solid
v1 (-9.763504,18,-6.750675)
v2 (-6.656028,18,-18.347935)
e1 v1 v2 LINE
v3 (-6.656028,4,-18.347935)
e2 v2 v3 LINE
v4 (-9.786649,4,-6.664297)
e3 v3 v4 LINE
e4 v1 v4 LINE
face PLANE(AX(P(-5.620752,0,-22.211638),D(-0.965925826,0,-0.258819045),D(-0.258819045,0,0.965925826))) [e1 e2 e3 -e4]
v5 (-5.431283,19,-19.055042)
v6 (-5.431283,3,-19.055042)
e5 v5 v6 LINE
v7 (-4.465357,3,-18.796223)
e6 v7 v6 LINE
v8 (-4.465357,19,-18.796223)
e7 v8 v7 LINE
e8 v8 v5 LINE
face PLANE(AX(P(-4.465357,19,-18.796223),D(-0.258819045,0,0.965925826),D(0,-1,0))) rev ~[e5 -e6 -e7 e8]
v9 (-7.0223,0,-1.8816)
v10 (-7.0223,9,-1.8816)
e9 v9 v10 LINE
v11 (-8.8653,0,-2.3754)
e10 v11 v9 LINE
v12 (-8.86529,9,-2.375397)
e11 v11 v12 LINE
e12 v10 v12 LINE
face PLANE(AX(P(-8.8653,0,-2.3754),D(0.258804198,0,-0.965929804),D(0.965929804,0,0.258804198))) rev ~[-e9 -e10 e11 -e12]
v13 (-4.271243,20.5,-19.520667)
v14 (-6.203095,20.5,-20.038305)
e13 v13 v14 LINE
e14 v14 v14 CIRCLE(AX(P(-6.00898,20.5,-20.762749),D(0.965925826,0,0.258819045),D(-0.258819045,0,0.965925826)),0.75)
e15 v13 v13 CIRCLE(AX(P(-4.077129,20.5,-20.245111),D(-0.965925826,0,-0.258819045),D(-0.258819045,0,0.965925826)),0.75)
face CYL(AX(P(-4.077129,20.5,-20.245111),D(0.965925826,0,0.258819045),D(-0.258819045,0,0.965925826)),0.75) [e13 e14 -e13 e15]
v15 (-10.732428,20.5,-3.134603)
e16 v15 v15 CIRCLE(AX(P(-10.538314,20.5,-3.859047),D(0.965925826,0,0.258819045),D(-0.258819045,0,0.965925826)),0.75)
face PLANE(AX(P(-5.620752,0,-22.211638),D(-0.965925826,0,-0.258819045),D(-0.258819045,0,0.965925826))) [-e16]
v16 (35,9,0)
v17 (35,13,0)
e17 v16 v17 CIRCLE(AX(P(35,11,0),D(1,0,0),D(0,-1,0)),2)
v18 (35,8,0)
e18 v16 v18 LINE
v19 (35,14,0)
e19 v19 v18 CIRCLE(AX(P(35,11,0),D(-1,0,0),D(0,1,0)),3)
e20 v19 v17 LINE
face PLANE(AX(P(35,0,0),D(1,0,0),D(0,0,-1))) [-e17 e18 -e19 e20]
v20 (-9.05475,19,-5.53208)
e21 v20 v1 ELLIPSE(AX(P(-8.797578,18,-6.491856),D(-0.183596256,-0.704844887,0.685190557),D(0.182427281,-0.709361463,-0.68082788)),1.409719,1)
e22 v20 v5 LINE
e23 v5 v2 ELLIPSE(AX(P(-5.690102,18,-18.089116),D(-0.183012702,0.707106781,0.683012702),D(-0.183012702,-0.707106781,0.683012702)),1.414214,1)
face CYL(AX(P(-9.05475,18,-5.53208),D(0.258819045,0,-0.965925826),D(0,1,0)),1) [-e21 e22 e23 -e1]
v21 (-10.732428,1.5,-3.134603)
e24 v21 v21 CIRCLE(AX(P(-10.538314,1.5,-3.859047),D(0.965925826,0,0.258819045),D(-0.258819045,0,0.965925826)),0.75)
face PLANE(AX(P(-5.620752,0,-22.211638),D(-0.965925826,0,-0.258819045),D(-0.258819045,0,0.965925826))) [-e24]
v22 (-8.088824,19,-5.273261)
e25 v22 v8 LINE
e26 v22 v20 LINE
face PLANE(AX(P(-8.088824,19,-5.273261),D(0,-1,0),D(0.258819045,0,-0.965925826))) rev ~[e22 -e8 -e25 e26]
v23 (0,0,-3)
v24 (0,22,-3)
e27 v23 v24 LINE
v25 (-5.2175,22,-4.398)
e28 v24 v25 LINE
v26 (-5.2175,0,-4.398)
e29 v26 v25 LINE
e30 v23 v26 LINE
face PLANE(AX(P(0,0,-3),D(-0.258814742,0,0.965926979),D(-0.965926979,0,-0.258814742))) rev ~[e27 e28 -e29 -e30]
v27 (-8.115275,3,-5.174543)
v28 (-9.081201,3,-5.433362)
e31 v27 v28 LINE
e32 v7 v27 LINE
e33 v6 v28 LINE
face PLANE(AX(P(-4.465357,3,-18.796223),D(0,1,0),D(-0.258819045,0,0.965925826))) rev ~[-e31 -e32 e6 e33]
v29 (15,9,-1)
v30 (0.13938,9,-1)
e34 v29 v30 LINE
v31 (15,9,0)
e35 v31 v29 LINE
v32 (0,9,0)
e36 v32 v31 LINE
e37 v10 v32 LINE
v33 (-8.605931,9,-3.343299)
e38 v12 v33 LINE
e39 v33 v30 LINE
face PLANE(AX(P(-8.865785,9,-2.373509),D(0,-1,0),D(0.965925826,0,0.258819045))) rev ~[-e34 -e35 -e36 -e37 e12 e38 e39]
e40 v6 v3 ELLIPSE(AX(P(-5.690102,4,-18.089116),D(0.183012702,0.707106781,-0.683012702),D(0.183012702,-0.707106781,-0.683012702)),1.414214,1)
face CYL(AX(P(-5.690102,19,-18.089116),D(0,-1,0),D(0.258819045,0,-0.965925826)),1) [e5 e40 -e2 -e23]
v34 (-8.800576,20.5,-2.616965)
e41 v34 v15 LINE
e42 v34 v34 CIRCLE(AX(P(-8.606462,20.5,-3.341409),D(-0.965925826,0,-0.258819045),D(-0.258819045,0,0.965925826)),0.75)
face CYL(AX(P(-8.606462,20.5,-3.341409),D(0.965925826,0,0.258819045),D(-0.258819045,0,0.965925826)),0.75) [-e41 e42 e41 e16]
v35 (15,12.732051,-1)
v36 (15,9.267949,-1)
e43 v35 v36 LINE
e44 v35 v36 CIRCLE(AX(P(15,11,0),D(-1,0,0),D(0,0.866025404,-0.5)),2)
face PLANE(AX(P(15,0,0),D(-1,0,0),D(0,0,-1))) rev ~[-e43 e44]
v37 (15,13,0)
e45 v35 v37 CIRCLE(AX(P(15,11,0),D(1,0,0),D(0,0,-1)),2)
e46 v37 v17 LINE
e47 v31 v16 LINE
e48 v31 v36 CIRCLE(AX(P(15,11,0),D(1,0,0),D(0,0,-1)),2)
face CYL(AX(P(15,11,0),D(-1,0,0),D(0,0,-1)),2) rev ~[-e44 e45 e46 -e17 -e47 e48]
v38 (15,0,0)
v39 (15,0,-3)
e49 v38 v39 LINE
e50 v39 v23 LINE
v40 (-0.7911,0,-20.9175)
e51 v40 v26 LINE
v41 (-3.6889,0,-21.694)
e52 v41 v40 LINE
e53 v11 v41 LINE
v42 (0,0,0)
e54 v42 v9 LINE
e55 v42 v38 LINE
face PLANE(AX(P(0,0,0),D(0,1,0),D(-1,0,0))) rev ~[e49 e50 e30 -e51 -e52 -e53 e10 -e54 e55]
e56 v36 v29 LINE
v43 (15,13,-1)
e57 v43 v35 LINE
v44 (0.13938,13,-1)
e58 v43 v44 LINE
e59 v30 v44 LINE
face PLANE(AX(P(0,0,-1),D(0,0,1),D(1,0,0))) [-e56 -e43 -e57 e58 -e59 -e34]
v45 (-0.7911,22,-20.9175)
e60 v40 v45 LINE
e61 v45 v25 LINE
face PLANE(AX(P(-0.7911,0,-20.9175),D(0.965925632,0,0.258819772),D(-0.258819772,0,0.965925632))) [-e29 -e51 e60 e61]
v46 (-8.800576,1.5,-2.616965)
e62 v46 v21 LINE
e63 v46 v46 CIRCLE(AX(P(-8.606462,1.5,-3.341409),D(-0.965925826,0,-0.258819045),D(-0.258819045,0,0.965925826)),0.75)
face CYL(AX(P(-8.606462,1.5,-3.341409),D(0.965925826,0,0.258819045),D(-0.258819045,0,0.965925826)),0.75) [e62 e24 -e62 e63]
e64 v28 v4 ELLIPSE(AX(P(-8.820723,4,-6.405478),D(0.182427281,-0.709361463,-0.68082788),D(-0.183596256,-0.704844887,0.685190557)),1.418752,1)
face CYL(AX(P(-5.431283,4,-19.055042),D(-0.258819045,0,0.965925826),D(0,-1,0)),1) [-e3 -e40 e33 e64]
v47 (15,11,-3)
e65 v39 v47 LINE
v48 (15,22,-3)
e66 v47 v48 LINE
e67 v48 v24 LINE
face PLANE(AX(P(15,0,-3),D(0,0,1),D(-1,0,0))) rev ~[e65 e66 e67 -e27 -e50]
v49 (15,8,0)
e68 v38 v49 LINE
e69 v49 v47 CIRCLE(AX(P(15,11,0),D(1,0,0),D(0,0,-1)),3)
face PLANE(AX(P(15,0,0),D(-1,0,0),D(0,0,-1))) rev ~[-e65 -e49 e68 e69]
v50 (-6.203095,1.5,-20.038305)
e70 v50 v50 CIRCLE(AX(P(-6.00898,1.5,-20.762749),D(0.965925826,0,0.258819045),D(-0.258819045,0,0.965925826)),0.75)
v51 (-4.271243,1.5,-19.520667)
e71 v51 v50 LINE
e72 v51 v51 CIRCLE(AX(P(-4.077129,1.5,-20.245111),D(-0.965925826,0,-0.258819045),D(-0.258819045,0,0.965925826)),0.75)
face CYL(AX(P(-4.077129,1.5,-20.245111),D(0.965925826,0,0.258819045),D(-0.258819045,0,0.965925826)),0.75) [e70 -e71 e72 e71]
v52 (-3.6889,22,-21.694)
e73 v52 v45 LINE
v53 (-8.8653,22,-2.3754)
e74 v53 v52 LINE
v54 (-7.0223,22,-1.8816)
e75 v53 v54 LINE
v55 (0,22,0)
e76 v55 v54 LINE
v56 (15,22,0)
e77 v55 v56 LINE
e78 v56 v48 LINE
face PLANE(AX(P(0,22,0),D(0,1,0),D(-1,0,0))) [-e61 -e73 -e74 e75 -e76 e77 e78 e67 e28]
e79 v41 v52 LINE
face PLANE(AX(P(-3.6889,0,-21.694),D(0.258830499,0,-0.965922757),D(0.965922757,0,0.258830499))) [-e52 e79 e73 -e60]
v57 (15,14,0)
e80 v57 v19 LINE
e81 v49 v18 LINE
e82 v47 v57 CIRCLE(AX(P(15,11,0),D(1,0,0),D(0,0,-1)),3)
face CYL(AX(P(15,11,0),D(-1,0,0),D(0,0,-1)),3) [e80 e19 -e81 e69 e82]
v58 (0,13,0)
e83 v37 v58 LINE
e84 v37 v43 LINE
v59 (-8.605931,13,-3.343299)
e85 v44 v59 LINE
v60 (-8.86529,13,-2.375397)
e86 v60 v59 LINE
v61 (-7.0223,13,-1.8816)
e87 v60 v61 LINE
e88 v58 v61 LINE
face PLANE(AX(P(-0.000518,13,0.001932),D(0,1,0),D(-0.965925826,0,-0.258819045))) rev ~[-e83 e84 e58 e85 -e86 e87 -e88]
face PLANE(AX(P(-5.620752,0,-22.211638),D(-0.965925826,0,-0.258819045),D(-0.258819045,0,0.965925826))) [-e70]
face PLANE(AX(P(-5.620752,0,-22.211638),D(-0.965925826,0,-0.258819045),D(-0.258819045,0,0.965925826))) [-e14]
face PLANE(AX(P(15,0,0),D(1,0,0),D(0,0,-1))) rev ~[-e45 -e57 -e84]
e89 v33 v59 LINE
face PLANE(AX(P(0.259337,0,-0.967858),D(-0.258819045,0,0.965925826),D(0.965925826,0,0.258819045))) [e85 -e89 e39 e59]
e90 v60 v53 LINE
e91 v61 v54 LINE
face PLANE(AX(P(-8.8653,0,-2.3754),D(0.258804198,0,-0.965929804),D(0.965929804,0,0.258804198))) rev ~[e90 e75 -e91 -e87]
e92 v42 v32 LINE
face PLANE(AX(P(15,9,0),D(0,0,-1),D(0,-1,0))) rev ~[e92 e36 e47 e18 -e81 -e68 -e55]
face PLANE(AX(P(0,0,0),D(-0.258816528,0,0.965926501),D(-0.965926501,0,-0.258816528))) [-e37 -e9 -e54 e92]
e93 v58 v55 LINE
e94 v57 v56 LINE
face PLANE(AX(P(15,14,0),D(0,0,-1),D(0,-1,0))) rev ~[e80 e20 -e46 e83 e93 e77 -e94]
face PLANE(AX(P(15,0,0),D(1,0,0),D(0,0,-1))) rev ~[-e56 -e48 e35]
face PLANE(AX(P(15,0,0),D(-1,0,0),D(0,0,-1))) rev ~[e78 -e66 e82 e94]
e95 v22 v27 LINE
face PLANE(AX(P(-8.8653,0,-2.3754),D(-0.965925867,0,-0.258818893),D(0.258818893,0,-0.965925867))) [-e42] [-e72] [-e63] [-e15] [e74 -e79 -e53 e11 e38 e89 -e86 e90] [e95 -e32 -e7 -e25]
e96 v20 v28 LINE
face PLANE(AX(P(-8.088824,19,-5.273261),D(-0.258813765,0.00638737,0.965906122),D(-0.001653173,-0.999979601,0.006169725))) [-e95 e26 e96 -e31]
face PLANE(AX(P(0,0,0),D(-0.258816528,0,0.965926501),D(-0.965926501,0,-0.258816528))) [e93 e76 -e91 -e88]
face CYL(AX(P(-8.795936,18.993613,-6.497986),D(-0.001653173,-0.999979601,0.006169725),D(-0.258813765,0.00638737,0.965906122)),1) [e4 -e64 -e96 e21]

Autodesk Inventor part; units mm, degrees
ref_plane "YZ Plane" through (0, 0, 0) normal (1, 0, 0) x (0, 1, 0)
ref_plane "XZ Plane" through (0, 0, 0) normal (0, 1, 0) x (-1, 0, 0)
ref_plane "XY Plane" through (0, 0, 0) normal (0, 0, 1) x (1, 0, 0)
sketch "Boceto1" plane through (0, 0, 0) normal (0, 1, 0) x (-1, 0, 0)
  line L0 (0, 0) -> (-15, 0)
  line L1 (0, 0) -> (7.0223, -1.8816)
  line L2 (0, 0) -> (7.27, 0) construction
  line L3 (8.8653, -2.3754) -> (7.0223, -1.8816)
  line L4 (8.8653, -2.3754) -> (3.6889, -21.694)
  line L5 (8.8653, -2.3754) -> (28.8653, -2.3754) construction
  line L6 (-15, 0) -> (-15, -3)
  line L7 (-15, -3) -> (0, -3)
  line L8 (0, -3) -> (5.2175, -4.398)
  line L9 (5.2175, -4.398) -> (25.2175, -4.398) construction
  line L10 (3.6889, -21.694) -> (0.7911, -20.9175)
  line L11 (0.7911, -20.9175) -> (5.2175, -4.398)
  point P0 (4.2275, -19.6837)
  dimension "d0" = 15
  dimension "d1" = 7.27
  dimension "d2" = 15
  dimension "d3" = 1.908
  dimension "d4" = 20
  dimension "d5" = 105
  dimension "d7" = 3
extrude "Extrusión1" add sketch "Boceto1" along normal blind 22
sketch "Boceto2" plane through (0, 0, 0) normal (-0.258819, 0, 0.9659258) x (0.9659258, 0, 0.258819)
  line L0 (-9.178, 0) -> (-9.178, 22) projected
  line L1 (-9.178, 0) -> (-9.178, 9)
  line L2 (-9.178, 9) -> (0, 9)
  line L3 (0, 9) -> (0, 13)
  line L4 (0, 13) -> (-9.178, 13)
  line L5 (-9.178, 13) -> (-9.178, 9)
  line L6 (0, 0) -> (0, 11)
  line L7 (0, 0) -> (0, 22) projected
  point P0 (-9.178, 13)
  dimension "d12" = 9
  dimension "d13" = 4
  dimension "d53" = 11
extrude "Extrusión2" cut sketch "Boceto2" against normal blind 1
sketch "Boceto3" plane through (0, 0, 0) normal (0, 0, 1) x (1, 0, 0)
  line L0 (15, 0) -> (15, 22) projected
  line L1 (15, 7) -> (15, 3.2945)
  line L2 (15, 3.2945) -> (15, 3)
  line L3 (15, 22) -> (0, 22) projected
  line L4 (15, 22) -> (15, 11)
  line L5 (15, 0) -> (15, 22) projected
  line L6 (0, 0) -> (0, 22) projected
  line L7 (13.0524, 11) -> (13.0524, 9)
  line L8 (13.0524, 9) -> (15, 9)
  line L9 (0, 9) -> (15, 9)
  line L10 (15, 11) -> (15, 13)
  line L11 (15, 13) -> (0, 13)
  point P0 (0, 9)
  point P1 (0, 13)
  dimension "d48" = 11
  dimension "d49" = 2
  dimension "d50" = 2
sketch "Boceto7" plane through (-3.6889, 0, -21.694) normal (-0.9659258, 0, -0.258819) x (-0.258819, 0, 0.9659258)
  line L0 (0, 0) -> (0, 22) projected
  line L1 (0, 0) -> (0, 3)
  line L2 (0, 3) -> (20, 3)
  line L3 (20, 3) -> (20, 19)
  line L4 (20, 13) -> (20, 22) projected
  line L5 (20, 19) -> (17, 19)
  line L6 (17, 19) -> (17.1022, 3)
  line L7 (17.1022, 0) -> (17.1022, 22) projected
  line L8 (17, 19) -> (0, 19)
  line L9 (0, 22) -> (3, 22)
  line L10 (17.1022, 22) -> (0, 22) projected
  line L11 (3, 22) -> (3, 0)
  point P0 (20, 0)
  point P1 (20, 7)
  point P2 (3, 19)
  point P3 (3, 3)
  dimension "d30" = 3
  dimension "d31" = 16
  dimension "d32" = 3
  dimension "d33" = 3
extrude "Extrusión6" add sketch "Boceto7" along normal blind 2 contours L11 L8 L6 L2
fillet "Empalme1" radius 1 4 edges at (-6.3972, 11, -19.3138) (-8.2222, 3, -12.503) (-10.0339, 11, -5.7415) (-8.2089, 19, -12.5523)
sketch "Boceto8" plane through (-3.6889, 0, -21.694) normal (-0.9659258, 0, -0.258819) x (-0.258819, 0, 0.9659258)
  line L0 (0, 0) -> (20, 0) projected
  line L1 (0, 0) -> (0, 1.5)
  line L2 (0, 0) -> (0, 22) projected
  line L3 (0, 1.5) -> (1.5, 1.5)
  line L4 (1.5, 1.5) -> (1.5, 20.5)
  line L5 (1.5, 20.5) -> (19, 20.5)
  line L6 (20, 13) -> (20, 22) projected
  line L7 (19, 20.5) -> (19, 1.5)
  line L8 (19, 1.5) -> (1.5, 1.5)
  circle A0 centre (1.5, 1.5) radius 0.75
  circle A1 centre (1.5, 20.5) radius 0.75
  circle A2 centre (19, 20.5) radius 0.75
  circle A3 centre (19, 1.5) radius 0.75
  dimension "d37" = 1.5
  dimension "d38" = 1.5
  dimension "d39" = 19
  dimension "d40" = 17.5
  dimension "d41" = 19
  dimension "d42" = 1.5
  dimension "d43" = 1.5
  dimension "d44" = 1.5
  dimension "d45" = 1.5
extrude "Extrusión7" add sketch "Boceto8" along normal blind 2 contours A0 L4 L3 | L3 L8 A0 | L4 A0 L8 | A1 L5 L4 | L4 L5 A1 | A3 L7 L8 | L8 L7 A3 | A2 L7 L5 | L5 L7 A2
extrude "Extrusión8" cut sketch "Boceto3" against normal blind 1 contours L8 L9 L6 L11 L0
sketch "Boceto9" plane through (15, 0, 0) normal (1, 0, 0) x (0, 0, -1)
  line L0 (0, 13) -> (0, 11)
  circle A0 centre (0, 11) radius 3
  circle A1 centre (0, 11) radius 2
  line L1 (0, 15.8082) -> (0, 4.1439)
  point P0 (0, 0)
  point P1 (0, 9)
  point P2 (0, 8)
  point P3 (0, 14)
  dimension "d54" = 2
  dimension "d55" = 4
extrude "Extrusión9" add sketch "Boceto9" along normal blind 20 contours L1 A0 A1 picked at (2.6416, 11.2225)
properties part number "GY_906 Casetop"
